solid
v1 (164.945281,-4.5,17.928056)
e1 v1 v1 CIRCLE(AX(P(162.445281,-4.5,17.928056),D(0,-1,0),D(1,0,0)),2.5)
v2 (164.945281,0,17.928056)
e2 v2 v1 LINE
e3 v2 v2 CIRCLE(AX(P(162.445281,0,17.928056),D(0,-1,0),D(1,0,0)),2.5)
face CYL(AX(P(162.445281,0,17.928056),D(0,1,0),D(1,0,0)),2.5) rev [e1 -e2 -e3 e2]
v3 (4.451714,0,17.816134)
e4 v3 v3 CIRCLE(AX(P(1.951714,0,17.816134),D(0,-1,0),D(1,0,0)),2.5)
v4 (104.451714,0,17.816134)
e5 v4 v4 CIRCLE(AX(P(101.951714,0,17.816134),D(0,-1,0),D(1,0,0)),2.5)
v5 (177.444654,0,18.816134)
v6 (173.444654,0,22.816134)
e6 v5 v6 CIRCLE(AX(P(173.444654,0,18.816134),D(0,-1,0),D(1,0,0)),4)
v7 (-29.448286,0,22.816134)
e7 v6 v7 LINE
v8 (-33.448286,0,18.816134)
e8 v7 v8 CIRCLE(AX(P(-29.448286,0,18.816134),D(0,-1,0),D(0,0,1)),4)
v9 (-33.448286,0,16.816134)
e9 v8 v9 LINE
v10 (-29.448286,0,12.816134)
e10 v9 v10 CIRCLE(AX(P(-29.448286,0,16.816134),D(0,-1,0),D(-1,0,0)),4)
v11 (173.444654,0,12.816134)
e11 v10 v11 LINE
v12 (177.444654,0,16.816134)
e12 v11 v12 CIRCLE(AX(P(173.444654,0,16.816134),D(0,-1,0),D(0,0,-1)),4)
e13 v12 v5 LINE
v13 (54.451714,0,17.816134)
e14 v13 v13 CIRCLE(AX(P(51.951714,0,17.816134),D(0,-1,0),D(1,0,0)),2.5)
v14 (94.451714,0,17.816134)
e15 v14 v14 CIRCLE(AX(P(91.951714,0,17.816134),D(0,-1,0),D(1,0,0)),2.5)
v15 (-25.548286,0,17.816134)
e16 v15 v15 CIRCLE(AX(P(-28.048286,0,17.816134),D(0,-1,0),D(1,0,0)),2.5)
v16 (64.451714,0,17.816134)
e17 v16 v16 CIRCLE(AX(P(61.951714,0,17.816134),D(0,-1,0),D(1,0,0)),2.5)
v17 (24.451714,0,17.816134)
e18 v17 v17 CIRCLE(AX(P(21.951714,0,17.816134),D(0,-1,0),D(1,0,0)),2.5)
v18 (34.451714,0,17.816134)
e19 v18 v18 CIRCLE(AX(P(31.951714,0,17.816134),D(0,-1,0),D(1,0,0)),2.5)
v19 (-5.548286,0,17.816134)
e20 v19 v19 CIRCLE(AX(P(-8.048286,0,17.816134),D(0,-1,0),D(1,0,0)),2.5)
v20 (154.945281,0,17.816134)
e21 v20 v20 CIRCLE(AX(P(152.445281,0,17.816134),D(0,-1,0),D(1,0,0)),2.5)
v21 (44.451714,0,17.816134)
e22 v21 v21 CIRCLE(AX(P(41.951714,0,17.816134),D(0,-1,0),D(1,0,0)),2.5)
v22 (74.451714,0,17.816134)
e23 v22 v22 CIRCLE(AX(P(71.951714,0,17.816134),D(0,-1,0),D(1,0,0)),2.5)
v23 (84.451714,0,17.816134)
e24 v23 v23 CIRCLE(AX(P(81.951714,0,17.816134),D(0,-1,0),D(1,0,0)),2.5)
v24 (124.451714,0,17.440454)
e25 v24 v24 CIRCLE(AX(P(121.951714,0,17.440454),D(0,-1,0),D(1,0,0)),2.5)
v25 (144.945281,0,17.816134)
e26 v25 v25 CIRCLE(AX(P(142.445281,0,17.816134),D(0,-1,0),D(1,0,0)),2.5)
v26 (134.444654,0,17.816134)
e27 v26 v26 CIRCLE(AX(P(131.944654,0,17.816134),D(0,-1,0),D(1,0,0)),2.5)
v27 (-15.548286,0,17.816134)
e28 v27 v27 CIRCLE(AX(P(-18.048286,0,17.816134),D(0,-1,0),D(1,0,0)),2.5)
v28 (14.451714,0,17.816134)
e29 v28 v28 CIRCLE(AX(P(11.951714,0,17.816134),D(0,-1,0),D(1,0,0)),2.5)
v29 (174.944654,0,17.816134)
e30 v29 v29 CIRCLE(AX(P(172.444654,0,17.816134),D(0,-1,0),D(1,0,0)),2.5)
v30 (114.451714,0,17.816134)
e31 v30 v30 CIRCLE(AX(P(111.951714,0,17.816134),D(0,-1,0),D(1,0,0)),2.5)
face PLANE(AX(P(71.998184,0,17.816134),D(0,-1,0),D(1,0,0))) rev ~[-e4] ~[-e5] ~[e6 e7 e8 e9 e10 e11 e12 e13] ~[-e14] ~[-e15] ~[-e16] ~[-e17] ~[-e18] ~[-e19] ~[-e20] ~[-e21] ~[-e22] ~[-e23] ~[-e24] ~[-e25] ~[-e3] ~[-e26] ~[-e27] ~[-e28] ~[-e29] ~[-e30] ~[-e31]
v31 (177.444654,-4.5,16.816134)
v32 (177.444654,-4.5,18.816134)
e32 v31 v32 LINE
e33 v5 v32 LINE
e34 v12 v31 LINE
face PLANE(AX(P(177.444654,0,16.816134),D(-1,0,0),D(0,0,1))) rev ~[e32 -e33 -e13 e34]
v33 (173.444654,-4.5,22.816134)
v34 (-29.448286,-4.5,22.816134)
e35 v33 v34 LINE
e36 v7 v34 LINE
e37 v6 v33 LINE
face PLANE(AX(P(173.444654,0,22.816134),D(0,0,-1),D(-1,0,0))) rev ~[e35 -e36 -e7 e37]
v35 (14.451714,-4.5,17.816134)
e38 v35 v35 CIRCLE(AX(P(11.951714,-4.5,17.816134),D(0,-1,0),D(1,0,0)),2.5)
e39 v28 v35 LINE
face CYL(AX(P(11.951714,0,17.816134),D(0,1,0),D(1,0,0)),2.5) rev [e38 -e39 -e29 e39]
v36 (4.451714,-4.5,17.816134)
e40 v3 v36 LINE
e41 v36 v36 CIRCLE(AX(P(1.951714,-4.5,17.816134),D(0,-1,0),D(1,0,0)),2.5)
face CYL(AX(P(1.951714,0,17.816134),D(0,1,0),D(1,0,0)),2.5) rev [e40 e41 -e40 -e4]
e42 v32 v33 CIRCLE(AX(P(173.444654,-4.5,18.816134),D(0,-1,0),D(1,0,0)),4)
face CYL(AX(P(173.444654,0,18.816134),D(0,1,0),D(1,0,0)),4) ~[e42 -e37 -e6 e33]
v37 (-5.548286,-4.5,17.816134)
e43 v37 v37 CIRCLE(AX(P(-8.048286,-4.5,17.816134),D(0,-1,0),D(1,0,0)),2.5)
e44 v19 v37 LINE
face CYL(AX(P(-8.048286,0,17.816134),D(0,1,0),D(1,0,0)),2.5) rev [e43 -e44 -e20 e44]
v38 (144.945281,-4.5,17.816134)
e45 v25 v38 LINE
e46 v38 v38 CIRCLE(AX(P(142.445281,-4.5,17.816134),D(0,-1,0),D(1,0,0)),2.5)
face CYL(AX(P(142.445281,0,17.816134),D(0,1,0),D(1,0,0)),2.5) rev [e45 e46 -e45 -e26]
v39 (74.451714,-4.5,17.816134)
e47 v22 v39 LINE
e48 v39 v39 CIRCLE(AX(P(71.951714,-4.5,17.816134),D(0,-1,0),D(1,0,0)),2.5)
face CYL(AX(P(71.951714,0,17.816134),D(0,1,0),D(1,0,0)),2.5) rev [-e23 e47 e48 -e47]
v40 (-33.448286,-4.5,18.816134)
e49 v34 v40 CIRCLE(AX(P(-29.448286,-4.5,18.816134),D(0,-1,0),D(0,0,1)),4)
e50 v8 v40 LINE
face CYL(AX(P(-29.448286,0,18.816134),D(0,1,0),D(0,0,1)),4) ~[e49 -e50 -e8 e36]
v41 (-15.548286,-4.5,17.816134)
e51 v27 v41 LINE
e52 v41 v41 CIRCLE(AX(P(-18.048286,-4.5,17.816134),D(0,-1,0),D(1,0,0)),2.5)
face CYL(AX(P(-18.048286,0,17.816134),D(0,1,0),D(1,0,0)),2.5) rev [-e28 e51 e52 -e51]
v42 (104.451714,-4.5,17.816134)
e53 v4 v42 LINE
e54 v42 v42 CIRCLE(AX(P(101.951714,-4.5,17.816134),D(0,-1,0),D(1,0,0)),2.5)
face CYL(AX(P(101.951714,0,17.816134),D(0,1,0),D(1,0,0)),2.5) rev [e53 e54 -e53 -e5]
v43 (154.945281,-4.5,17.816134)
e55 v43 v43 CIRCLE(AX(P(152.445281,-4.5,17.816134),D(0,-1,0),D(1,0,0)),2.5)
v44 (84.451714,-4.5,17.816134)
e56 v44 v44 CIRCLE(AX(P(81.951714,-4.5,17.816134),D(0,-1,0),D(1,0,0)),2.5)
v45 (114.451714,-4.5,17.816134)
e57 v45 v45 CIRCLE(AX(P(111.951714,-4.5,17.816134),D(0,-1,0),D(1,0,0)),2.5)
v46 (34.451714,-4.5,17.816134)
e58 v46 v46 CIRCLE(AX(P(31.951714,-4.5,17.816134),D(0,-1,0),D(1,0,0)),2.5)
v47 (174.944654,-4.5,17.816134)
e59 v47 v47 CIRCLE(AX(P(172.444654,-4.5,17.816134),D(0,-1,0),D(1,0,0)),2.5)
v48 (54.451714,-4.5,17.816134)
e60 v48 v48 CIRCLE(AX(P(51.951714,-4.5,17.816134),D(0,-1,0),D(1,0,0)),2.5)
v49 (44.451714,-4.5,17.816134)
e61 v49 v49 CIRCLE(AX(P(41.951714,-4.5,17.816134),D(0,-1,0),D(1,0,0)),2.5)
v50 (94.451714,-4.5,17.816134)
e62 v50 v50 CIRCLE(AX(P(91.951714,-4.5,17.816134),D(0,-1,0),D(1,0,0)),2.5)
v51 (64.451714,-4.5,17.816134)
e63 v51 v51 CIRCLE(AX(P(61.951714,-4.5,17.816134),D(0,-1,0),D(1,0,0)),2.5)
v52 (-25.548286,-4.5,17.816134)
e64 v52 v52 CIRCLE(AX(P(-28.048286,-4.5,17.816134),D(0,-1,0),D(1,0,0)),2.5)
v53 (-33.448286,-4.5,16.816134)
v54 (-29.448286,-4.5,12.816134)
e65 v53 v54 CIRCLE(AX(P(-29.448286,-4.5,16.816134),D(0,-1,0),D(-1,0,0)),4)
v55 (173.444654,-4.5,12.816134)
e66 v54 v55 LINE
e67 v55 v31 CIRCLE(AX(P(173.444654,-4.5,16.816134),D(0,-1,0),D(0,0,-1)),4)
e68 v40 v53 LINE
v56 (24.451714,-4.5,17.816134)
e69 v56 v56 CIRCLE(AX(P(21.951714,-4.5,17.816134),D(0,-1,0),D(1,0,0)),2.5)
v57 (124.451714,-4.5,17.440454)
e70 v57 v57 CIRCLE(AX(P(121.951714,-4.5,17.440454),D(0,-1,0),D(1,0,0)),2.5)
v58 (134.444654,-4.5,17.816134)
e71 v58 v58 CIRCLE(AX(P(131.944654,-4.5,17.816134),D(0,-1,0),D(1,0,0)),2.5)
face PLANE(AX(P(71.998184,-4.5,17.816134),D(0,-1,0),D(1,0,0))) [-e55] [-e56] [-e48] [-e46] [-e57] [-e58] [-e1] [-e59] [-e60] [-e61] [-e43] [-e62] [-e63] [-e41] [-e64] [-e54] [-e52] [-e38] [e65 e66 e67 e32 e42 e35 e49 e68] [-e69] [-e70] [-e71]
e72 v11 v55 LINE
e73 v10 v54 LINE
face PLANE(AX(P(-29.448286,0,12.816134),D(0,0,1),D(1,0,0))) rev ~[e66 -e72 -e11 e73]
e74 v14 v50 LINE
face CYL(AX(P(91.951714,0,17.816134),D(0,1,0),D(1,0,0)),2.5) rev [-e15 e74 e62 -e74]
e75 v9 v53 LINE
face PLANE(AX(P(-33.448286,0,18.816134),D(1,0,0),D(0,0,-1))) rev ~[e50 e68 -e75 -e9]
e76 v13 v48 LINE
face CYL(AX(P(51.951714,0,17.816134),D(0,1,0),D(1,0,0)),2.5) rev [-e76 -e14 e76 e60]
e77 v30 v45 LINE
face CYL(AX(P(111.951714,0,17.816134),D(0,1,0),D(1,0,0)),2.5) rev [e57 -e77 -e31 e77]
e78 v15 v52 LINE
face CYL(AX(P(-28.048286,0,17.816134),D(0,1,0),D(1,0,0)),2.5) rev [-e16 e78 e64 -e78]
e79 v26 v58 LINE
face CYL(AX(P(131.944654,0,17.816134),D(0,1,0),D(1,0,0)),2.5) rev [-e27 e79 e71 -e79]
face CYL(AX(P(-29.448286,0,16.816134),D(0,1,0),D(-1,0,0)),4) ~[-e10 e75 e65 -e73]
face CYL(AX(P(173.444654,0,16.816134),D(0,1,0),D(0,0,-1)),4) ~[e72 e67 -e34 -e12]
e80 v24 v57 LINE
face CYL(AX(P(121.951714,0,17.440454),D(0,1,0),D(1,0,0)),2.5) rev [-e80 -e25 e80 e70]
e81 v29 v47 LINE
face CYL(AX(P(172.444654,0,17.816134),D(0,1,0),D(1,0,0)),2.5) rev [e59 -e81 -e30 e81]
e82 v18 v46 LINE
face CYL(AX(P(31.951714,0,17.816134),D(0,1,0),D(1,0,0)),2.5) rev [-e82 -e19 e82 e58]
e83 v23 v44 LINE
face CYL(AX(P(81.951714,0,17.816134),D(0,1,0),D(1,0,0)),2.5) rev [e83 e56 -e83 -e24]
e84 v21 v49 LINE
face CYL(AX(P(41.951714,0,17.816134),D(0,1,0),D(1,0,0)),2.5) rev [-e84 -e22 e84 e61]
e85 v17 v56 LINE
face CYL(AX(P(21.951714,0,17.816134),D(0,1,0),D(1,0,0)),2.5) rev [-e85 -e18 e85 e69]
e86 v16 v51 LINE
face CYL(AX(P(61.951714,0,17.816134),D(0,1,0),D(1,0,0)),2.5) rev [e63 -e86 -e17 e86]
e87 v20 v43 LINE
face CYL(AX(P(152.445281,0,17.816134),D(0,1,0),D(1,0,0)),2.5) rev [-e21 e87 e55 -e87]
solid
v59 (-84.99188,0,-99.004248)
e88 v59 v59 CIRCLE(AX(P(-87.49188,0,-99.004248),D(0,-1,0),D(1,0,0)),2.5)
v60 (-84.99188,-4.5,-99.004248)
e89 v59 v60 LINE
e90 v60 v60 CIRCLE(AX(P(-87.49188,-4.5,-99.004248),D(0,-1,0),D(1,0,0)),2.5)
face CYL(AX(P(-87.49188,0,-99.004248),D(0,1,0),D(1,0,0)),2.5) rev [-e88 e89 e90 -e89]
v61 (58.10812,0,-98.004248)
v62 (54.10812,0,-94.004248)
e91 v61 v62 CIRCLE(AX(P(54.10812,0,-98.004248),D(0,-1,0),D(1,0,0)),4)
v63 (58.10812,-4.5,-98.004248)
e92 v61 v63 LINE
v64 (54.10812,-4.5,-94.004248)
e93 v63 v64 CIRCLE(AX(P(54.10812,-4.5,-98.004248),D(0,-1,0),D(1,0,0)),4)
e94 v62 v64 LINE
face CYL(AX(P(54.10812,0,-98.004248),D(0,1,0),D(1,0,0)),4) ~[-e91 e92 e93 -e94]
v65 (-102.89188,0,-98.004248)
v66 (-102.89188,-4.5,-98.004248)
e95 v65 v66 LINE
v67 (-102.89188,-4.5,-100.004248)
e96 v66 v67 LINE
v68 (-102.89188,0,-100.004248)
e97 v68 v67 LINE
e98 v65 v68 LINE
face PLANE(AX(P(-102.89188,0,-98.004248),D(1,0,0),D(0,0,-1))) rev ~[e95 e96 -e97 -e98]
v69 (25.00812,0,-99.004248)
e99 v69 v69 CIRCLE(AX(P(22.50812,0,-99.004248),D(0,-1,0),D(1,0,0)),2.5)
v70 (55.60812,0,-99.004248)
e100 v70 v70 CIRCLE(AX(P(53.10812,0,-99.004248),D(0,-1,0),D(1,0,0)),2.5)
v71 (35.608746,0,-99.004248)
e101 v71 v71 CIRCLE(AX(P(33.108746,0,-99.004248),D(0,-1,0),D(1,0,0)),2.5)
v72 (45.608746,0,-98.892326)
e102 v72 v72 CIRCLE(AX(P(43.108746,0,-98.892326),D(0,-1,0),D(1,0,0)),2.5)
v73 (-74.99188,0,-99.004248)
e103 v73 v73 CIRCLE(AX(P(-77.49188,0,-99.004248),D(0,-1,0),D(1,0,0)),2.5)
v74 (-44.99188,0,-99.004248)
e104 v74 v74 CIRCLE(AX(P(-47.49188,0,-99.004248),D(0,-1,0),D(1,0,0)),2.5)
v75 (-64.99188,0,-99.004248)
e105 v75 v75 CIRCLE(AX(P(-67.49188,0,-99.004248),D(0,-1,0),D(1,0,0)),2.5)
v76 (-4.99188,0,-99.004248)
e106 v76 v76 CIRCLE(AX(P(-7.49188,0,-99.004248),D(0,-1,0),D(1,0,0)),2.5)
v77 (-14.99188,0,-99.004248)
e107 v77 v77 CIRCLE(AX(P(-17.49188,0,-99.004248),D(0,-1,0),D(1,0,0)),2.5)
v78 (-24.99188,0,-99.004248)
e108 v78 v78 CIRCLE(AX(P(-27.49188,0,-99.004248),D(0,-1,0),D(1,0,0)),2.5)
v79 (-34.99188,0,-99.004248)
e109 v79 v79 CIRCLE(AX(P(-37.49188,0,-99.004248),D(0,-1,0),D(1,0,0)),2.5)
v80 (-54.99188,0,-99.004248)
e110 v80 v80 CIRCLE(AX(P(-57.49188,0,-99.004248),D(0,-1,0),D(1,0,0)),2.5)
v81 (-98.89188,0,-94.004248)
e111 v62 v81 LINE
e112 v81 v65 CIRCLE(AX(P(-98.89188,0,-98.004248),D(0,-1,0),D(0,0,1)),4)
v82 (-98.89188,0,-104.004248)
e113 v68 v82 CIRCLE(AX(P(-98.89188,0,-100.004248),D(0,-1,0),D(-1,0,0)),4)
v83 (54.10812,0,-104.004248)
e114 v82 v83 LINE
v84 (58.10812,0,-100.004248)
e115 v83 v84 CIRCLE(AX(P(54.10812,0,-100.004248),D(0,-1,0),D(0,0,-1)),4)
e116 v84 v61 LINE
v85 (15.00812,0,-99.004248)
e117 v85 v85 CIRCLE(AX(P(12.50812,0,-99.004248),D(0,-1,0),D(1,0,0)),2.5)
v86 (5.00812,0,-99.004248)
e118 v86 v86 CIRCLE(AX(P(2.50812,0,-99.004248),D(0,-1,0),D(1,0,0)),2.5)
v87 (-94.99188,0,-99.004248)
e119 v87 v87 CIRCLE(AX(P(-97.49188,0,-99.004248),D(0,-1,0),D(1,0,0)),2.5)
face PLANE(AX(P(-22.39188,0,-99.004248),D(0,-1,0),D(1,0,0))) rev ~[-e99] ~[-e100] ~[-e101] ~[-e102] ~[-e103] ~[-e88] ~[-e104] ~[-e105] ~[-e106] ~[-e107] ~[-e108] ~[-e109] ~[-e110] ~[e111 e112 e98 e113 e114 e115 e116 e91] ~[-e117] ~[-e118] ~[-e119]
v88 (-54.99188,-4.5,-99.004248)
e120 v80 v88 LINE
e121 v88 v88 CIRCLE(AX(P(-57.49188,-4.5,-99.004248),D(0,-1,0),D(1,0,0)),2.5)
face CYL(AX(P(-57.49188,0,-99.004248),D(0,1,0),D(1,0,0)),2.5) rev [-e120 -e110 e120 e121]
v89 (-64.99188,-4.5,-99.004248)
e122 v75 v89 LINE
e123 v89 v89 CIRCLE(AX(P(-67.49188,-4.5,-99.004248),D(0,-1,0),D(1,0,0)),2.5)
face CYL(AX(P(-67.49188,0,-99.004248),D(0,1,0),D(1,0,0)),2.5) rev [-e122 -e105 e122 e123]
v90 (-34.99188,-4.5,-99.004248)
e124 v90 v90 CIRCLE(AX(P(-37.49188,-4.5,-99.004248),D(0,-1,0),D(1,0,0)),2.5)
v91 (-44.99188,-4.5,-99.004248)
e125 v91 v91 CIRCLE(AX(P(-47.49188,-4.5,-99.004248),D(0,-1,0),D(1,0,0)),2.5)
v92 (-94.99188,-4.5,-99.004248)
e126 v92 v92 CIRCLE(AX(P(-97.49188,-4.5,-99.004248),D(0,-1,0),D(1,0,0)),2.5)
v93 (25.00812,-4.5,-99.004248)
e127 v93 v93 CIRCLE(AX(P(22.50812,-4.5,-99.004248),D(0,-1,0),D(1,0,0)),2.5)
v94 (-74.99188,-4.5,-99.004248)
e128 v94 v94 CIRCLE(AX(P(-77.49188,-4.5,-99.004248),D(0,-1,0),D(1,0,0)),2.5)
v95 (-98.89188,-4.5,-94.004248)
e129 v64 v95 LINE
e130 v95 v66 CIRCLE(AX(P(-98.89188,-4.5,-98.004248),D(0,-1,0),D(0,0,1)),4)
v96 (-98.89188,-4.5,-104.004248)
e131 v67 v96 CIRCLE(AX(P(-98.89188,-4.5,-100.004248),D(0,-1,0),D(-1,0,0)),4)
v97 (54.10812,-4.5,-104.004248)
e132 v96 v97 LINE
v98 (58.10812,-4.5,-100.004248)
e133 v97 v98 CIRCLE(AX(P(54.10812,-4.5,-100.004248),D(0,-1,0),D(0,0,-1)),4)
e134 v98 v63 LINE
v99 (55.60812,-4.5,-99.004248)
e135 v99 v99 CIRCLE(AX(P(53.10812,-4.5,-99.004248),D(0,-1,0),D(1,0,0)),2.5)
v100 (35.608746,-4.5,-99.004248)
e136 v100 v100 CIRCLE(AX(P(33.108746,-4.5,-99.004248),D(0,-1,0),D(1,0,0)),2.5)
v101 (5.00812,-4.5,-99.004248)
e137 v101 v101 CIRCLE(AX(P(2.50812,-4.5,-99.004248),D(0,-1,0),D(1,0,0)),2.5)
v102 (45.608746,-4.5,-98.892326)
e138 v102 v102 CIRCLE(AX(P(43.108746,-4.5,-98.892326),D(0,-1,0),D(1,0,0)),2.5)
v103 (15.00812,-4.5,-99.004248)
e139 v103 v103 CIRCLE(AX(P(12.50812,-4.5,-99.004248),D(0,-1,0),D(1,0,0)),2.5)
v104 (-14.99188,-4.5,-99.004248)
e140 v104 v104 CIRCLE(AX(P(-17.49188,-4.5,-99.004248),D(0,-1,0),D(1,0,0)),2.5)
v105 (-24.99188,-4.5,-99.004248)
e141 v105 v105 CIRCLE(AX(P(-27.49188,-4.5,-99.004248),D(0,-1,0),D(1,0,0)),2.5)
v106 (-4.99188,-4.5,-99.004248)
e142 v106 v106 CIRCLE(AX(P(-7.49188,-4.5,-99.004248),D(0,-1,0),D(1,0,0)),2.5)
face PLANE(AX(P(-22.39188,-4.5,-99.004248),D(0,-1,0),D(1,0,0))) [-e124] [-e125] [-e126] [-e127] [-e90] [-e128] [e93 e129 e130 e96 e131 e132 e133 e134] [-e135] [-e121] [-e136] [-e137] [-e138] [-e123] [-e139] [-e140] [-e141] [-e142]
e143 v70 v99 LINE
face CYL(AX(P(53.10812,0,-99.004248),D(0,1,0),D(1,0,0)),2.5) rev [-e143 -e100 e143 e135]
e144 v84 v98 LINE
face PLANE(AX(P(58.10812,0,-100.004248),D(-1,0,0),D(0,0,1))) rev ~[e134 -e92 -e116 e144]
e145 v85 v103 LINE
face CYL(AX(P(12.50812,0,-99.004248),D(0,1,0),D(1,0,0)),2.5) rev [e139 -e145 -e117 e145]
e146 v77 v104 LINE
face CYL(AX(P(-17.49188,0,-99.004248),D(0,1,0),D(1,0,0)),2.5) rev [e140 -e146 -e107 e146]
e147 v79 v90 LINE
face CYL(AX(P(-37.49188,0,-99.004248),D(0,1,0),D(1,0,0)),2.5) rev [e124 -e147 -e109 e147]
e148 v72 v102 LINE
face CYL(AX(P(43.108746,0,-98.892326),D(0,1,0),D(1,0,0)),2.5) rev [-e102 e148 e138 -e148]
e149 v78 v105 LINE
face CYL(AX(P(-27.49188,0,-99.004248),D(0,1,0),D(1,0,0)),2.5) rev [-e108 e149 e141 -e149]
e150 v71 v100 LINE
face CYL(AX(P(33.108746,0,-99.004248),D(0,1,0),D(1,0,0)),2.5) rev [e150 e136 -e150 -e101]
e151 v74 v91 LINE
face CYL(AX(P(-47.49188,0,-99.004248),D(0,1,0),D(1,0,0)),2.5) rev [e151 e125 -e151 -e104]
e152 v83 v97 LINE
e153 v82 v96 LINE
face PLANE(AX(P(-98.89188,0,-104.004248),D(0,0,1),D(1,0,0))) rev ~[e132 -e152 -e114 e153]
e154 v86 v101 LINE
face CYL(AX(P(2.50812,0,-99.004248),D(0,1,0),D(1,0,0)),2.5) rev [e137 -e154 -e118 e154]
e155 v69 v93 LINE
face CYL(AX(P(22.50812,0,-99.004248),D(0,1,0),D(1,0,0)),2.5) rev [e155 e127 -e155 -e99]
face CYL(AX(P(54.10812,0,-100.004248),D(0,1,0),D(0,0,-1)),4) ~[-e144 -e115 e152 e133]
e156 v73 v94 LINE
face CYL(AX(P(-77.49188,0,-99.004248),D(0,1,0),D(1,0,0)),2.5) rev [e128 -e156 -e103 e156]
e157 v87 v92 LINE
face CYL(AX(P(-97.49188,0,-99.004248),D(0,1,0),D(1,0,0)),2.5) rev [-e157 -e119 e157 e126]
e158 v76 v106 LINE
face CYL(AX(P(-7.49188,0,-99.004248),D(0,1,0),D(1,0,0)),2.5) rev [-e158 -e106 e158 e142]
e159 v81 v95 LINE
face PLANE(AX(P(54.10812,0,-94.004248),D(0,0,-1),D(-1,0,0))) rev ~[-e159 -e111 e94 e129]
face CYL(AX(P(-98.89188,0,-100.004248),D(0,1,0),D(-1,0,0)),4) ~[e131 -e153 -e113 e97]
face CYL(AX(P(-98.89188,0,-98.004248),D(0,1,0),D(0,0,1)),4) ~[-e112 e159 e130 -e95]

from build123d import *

# Parameters (mm, degrees)
F0_R     = 2.5
F1_DEPTH = 4.5
F2_DEPTH = 4.5


# Not quite as in the source:
# - a feature names something its author has since deleted; it is built from what else it names


with BuildPart() as f1:
    # F0 (on Front) → F1 (new body)
    with BuildSketch(Plane.XZ):
        with BuildLine():
            Line((173.4446543215, 22.8161337823), (-29.448286426, 22.8161337823))
            ThreePointArc((-29.448286426, 22.8161337823), (-32.2767135507, 21.6445609071), (-33.448286426, 18.8161337823))
            Line((-33.448286426, 18.8161337823), (-33.448286426, 16.8161337823))
            ThreePointArc((-33.448286426, 16.8161337823), (-32.2767135507, 13.9877066576), (-29.448286426, 12.8161337823))
            Line((-29.448286426, 12.8161337823), (173.4446543215, 12.8161337823))
            ThreePointArc((173.4446543215, 12.8161337823), (176.2730814463, 13.9877066576), (177.4446543215, 16.8161337823))
            Line((177.4446543215, 16.8161337823), (177.4446543215, 18.8161337823))
            ThreePointArc((177.4446543215, 18.8161337823), (176.2730814463, 21.6445609071), (173.4446543215, 22.8161337823))
        make_face()
        with Locations((-28.048286426, 17.8161337823)):
            Circle(F0_R, mode=Mode.SUBTRACT)
        with Locations((-18.048286426, 17.8161337823)):
            Circle(F0_R, mode=Mode.SUBTRACT)
        with Locations((-8.048286426, 17.8161337823)):
            Circle(F0_R, mode=Mode.SUBTRACT)
        with Locations((1.951713574, 17.8161337823)):
            Circle(F0_R, mode=Mode.SUBTRACT)
        with Locations((11.951713574, 17.8161337823)):
            Circle(F0_R, mode=Mode.SUBTRACT)
        with Locations((21.951713574, 17.8161337823)):
            Circle(F0_R, mode=Mode.SUBTRACT)
        with Locations((31.951713574, 17.8161337823)):
            Circle(F0_R, mode=Mode.SUBTRACT)
        with Locations((41.951713574, 17.8161337823)):
            Circle(F0_R, mode=Mode.SUBTRACT)
        with Locations((51.951713574, 17.8161337823)):
            Circle(F0_R, mode=Mode.SUBTRACT)
        with Locations((61.951713574, 17.8161337823)):
            Circle(F0_R, mode=Mode.SUBTRACT)
        with Locations((71.951713574, 17.8161337823)):
            Circle(F0_R, mode=Mode.SUBTRACT)
        with Locations((81.951713574, 17.8161337823)):
            Circle(F0_R, mode=Mode.SUBTRACT)
        with Locations((91.951713574, 17.8161337823)):
            Circle(F0_R, mode=Mode.SUBTRACT)
        with Locations((101.951713574, 17.8161337823)):
            Circle(F0_R, mode=Mode.SUBTRACT)
        with Locations((111.951713574, 17.8161337823)):
            Circle(F0_R, mode=Mode.SUBTRACT)
        with Locations((121.951713574, 17.4404541092)):
            Circle(F0_R, mode=Mode.SUBTRACT)
        with Locations((131.9446543215, 17.8161337823)):
            Circle(F0_R, mode=Mode.SUBTRACT)
        with Locations((142.4452806723, 17.8161337823)):
            Circle(F0_R, mode=Mode.SUBTRACT)
        with Locations((152.4452806723, 17.8161337823)):
            Circle(F0_R, mode=Mode.SUBTRACT)
        with Locations((162.4452806723, 17.9280561807)):
            Circle(F0_R, mode=Mode.SUBTRACT)
        with Locations((172.4446543215, 17.8161337823)):
            Circle(F0_R, mode=Mode.SUBTRACT)
    extrude(amount=F1_DEPTH)


with BuildPart() as f2:
    # F0 (on Front) → F2 (new body)
    with BuildSketch(Plane.XZ):
        with BuildLine():
            Line((54.1081197957, -94.0042481228), (-98.8918802043, -94.0042481228))
            ThreePointArc((-98.8918802043, -94.0042481228), (-101.720307329, -95.175820998), (-102.8918802043, -98.0042481228))
            Line((-102.8918802043, -98.0042481228), (-102.8918802043, -100.0042481228))
            ThreePointArc((-102.8918802043, -100.0042481228), (-101.720307329, -102.8326752475), (-98.8918802043, -104.0042481228))
            Line((-98.8918802043, -104.0042481228), (54.1081197957, -104.0042481228))
            ThreePointArc((54.1081197957, -104.0042481228), (56.9365469205, -102.8326752475), (58.1081197957, -100.0042481228))
            Line((58.1081197957, -100.0042481228), (58.1081197957, -98.0042481228))
            ThreePointArc((58.1081197957, -98.0042481228), (56.9365469205, -95.175820998), (54.1081197957, -94.0042481228))
        make_face()
        with Locations((-97.4918802043, -99.0042481228)):
            Circle(F0_R, mode=Mode.SUBTRACT)
        with Locations((-87.4918802043, -99.0042481228)):
            Circle(F0_R, mode=Mode.SUBTRACT)
        with Locations((-77.4918802043, -99.0042481228)):
            Circle(F0_R, mode=Mode.SUBTRACT)
        with Locations((-67.4918802043, -99.0042481228)):
            Circle(F0_R, mode=Mode.SUBTRACT)
        with Locations((-57.4918802043, -99.0042481228)):
            Circle(F0_R, mode=Mode.SUBTRACT)
        with Locations((-47.4918802043, -99.0042481228)):
            Circle(F0_R, mode=Mode.SUBTRACT)
        with Locations((-37.4918802043, -99.0042481228)):
            Circle(F0_R, mode=Mode.SUBTRACT)
        with Locations((-27.4918802043, -99.0042481228)):
            Circle(F0_R, mode=Mode.SUBTRACT)
        with Locations((-17.4918802043, -99.0042481228)):
            Circle(F0_R, mode=Mode.SUBTRACT)
        with Locations((-7.4918802043, -99.0042481228)):
            Circle(F0_R, mode=Mode.SUBTRACT)
        with Locations((2.5081197957, -99.0042481228)):
            Circle(F0_R, mode=Mode.SUBTRACT)
        with Locations((12.5081197957, -99.0042481228)):
            Circle(F0_R, mode=Mode.SUBTRACT)
        with Locations((22.5081197957, -99.0042481228)):
            Circle(F0_R, mode=Mode.SUBTRACT)
        with Locations((33.1087461465, -99.0042481228)):
            Circle(F0_R, mode=Mode.SUBTRACT)
        with Locations((43.1087461465, -98.8923257244)):
            Circle(F0_R, mode=Mode.SUBTRACT)
        with Locations((53.1081197957, -99.0042481228)):
            Circle(F0_R, mode=Mode.SUBTRACT)
    extrude(amount=F2_DEPTH)


solid = Compound([f1.part, f2.part])
